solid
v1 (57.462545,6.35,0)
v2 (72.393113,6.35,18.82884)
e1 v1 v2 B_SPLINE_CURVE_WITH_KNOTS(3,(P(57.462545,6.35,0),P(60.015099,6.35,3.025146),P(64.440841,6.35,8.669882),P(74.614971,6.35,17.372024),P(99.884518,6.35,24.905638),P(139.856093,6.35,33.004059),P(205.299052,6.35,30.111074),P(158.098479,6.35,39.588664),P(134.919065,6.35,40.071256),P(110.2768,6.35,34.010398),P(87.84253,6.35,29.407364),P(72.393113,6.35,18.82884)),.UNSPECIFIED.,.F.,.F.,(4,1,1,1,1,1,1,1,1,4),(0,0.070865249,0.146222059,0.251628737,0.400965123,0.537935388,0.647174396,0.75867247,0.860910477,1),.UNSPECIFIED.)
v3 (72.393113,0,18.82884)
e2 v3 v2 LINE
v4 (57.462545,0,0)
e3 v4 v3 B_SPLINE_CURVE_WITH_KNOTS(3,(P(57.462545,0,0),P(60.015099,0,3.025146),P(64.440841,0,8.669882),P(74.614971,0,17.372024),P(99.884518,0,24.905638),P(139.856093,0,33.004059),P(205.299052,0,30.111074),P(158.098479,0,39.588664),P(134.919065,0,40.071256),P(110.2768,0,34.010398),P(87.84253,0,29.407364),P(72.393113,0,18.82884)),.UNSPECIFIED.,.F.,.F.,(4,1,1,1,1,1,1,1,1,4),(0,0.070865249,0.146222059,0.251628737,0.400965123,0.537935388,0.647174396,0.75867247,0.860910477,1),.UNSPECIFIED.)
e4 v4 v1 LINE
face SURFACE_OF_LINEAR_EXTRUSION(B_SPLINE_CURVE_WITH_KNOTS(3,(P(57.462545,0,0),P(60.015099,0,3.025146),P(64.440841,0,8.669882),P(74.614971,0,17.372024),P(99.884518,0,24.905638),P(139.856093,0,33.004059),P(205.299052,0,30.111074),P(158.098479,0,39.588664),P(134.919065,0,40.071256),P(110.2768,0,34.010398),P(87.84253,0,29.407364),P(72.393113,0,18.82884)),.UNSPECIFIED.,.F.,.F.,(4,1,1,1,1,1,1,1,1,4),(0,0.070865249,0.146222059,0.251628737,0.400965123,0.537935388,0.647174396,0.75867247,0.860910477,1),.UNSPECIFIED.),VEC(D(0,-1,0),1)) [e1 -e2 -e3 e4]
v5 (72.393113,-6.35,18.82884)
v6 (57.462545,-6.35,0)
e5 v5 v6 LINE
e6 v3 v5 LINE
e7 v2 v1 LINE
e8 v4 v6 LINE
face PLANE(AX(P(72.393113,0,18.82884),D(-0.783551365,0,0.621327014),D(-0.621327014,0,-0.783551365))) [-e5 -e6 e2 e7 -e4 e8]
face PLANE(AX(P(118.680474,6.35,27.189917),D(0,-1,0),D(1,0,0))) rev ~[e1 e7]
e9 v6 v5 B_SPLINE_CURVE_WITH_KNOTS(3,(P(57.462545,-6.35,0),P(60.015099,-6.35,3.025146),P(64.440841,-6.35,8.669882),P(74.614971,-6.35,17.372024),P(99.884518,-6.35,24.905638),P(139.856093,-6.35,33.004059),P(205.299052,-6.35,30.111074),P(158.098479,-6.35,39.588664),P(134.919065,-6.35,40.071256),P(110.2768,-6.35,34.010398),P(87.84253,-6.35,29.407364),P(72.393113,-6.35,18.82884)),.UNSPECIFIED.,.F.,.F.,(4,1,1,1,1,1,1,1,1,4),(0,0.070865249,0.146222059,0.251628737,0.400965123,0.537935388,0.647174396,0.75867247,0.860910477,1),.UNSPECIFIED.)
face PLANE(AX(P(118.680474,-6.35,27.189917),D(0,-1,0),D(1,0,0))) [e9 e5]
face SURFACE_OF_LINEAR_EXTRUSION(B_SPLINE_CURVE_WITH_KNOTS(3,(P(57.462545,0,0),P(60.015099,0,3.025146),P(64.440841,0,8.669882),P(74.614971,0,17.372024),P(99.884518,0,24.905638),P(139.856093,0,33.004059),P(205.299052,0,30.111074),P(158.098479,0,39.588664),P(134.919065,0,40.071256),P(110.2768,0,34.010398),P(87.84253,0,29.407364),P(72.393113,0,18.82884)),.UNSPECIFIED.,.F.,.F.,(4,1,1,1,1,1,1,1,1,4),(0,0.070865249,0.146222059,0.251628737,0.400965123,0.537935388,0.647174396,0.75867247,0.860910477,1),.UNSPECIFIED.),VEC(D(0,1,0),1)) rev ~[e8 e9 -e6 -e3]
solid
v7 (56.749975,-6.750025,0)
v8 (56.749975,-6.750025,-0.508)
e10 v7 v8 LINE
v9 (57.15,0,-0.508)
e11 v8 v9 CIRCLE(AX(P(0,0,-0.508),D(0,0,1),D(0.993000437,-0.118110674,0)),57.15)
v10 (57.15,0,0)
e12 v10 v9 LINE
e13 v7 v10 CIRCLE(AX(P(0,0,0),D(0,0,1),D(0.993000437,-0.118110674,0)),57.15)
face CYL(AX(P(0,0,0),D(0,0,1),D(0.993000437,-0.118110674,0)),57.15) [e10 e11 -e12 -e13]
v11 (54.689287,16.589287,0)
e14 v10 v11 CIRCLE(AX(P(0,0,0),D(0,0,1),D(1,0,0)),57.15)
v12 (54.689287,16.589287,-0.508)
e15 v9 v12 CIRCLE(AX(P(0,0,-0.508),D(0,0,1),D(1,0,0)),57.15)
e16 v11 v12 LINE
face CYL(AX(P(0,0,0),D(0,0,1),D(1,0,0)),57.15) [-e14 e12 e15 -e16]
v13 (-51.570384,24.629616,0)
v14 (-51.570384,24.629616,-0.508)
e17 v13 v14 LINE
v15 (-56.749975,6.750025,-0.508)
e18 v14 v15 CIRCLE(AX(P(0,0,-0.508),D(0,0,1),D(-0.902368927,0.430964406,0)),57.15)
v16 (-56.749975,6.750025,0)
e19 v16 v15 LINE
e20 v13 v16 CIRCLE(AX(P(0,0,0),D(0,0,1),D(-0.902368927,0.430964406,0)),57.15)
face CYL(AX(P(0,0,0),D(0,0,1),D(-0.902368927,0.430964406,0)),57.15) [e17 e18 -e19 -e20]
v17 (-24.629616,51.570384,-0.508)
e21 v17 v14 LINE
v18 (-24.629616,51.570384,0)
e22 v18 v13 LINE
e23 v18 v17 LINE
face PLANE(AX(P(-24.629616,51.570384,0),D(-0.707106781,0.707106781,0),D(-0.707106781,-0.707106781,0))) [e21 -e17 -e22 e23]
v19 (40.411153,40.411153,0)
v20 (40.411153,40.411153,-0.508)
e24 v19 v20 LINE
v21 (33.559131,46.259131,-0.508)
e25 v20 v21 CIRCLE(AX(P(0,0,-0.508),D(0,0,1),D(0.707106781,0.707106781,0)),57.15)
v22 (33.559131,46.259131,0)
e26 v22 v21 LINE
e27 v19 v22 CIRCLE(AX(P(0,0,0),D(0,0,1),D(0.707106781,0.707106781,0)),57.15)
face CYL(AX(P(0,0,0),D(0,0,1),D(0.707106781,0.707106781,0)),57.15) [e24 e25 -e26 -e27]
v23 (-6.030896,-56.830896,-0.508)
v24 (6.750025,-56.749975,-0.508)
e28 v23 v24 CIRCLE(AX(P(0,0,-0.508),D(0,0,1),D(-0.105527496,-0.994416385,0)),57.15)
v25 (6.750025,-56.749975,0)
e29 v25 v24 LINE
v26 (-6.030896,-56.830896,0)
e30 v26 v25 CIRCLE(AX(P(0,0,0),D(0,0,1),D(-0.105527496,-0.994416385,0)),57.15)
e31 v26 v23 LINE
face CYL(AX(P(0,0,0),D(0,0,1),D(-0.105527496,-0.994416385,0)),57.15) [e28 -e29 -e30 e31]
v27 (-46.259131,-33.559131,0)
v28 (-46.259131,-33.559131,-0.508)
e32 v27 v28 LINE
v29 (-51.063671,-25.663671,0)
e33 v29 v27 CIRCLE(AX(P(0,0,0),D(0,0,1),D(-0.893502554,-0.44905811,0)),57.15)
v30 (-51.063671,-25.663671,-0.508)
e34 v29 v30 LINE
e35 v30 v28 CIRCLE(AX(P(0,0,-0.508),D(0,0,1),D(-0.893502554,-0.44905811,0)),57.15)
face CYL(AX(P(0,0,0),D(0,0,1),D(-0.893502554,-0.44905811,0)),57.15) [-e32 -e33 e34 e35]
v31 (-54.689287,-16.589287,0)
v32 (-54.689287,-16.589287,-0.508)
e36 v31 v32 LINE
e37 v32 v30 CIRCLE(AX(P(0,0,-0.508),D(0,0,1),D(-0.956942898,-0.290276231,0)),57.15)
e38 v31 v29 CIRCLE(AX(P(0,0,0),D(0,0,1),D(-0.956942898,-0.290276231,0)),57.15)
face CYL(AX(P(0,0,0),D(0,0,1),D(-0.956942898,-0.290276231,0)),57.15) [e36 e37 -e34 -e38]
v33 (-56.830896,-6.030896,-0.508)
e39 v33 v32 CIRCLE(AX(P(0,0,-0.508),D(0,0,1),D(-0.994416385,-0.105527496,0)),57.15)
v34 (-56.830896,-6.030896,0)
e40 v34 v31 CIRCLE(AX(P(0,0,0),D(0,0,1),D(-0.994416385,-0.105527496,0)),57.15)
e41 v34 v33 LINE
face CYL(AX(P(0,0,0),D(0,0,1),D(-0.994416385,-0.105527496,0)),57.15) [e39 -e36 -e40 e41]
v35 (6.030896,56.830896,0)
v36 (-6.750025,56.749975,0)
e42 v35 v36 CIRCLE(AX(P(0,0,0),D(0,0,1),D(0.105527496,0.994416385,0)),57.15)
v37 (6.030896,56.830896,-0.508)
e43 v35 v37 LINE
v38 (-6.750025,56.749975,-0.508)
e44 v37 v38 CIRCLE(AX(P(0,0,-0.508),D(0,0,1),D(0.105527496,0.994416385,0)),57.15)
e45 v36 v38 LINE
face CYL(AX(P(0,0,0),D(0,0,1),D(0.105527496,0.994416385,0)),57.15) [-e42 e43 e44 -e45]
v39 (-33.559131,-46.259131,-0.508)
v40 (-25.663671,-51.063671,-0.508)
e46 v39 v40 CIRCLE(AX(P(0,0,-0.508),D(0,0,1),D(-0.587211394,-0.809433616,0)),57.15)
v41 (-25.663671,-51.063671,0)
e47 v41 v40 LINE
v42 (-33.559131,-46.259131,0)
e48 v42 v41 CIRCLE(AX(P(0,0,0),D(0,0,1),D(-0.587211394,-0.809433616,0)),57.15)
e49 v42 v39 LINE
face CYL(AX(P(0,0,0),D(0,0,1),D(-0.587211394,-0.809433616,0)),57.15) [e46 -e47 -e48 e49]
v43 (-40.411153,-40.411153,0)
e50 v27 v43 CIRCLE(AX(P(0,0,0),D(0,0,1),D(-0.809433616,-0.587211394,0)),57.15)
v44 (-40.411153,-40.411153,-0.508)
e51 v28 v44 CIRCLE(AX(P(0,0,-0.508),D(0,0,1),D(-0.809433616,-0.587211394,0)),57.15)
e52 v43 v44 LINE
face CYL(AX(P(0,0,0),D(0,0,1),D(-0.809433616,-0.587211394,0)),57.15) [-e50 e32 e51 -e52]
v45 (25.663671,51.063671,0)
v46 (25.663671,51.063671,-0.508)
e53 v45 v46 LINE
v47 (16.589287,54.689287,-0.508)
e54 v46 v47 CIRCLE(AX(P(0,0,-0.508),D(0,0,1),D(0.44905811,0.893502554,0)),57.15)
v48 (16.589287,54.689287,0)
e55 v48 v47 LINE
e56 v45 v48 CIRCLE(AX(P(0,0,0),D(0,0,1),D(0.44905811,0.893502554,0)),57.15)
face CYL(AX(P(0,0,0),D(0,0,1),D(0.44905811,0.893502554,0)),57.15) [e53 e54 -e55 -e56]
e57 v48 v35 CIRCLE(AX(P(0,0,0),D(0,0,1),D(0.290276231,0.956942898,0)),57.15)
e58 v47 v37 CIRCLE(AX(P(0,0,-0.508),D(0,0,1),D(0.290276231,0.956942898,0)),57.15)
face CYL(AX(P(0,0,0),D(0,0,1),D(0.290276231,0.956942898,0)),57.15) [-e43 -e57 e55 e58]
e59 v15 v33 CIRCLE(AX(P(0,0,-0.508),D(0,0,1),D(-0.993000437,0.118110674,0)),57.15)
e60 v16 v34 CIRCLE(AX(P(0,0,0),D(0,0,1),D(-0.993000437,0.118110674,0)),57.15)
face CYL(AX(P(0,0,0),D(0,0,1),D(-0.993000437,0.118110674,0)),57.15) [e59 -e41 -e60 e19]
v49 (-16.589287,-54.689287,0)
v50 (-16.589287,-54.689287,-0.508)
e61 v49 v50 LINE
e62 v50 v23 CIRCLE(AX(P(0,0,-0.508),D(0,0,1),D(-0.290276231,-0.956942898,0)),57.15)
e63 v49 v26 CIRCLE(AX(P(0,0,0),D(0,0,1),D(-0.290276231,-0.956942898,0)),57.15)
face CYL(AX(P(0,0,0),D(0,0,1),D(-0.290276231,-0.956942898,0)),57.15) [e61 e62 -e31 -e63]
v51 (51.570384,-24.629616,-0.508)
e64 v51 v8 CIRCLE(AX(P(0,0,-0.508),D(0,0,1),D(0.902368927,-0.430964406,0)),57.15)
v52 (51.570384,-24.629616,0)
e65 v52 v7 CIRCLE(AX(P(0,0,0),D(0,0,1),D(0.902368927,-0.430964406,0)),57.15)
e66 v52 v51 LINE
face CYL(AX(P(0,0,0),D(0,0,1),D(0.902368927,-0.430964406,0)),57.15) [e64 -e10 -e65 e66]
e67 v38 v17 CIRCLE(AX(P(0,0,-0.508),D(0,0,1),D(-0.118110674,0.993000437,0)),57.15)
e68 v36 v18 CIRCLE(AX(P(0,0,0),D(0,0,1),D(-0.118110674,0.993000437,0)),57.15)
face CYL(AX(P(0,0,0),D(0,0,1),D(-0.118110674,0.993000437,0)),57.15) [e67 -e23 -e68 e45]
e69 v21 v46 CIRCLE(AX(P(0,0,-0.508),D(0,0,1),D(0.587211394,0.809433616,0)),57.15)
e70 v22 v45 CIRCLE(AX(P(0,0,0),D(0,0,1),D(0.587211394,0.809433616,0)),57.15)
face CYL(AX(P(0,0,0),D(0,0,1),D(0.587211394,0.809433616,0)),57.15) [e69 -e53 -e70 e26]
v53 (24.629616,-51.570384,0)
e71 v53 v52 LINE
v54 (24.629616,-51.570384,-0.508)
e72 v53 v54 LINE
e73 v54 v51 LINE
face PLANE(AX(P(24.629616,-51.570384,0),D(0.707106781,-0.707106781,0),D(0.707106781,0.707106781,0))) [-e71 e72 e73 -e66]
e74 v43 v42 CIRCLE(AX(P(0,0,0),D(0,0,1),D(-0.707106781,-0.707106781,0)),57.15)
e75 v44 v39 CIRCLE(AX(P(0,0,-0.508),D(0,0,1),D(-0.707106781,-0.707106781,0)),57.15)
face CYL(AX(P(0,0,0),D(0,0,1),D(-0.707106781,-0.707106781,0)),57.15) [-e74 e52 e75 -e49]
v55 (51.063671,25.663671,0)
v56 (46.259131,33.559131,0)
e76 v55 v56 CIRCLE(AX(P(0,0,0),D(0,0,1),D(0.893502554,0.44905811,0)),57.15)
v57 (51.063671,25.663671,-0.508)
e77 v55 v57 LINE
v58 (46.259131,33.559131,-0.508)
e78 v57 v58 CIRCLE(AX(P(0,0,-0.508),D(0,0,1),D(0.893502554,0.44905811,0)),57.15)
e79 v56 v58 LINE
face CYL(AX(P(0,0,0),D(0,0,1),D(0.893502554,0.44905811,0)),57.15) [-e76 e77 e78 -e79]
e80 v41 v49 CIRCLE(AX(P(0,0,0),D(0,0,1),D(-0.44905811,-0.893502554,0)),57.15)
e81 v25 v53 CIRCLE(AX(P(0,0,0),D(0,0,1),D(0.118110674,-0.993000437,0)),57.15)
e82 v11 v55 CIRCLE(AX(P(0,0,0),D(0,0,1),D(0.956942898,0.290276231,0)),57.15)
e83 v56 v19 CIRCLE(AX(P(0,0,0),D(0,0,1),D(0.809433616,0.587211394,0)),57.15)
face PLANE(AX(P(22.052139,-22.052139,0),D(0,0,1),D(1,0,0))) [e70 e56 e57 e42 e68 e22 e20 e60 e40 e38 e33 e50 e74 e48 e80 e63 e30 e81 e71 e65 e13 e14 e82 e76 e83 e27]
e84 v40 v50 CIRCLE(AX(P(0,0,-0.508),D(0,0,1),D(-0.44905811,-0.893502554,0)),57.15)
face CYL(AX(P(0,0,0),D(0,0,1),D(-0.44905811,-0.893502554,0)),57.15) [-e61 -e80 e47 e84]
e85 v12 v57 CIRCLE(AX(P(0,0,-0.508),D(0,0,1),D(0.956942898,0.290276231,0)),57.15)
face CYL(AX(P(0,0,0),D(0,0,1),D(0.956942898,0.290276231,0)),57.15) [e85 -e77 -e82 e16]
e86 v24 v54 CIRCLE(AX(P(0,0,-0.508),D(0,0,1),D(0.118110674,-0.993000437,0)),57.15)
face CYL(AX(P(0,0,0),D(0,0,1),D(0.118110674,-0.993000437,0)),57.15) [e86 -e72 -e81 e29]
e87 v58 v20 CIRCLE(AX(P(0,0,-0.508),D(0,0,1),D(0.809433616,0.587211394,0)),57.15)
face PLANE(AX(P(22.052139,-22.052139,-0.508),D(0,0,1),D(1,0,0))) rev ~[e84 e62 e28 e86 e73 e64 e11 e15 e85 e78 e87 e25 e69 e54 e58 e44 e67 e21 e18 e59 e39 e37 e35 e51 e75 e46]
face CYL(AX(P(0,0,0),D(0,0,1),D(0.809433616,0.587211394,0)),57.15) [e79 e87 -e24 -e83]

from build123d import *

# Parameters (mm, degrees)
F4_DEPTH = 0.508
F6_DEPTH = 6.35


# Not quite as in the source:
# - the program builds the solid bodies; features that only make, move or delete a surface that nothing else refers to are left out


with BuildPart() as f4:
    # F0 (on Top) → F4 (new body)
    with BuildSketch(Plane.XY):
        with BuildLine():
            Line((-6.0308964237, -56.8308964237), (56.8308964237, 6.0308964237))
            ThreePointArc((56.8308964237, 6.0308964237), (56.009443014, 11.3606686977), (54.689286609, 16.589286609))
            Line((54.689286609, 16.589286609), (-16.589286609, -54.689286609))
            ThreePointArc((-16.589286609, -54.689286609), (-11.3606686977, -56.009443014), (-6.0308964237, -56.8308964237))
        make_face()
        with BuildLine():
            Line((-16.589286609, -54.689286609), (54.689286609, 16.589286609))
            ThreePointArc((54.689286609, 16.589286609), (53.0707840703, 21.2041122936), (51.0636709662, 25.6636709662))
            Line((51.0636709662, 25.6636709662), (-25.6636709662, -51.0636709662))
            ThreePointArc((-25.6636709662, -51.0636709662), (-21.2041122936, -53.0707840703), (-16.589286609, -54.689286609))
        make_face()
        with BuildLine():
            Line((-25.6636709662, -51.0636709662), (51.0636709662, 25.6636709662))
            ThreePointArc((51.0636709662, 25.6636709662), (48.8212712491, 29.7086851548), (46.2591311607, 33.5591311607))
            Line((46.2591311607, 33.5591311607), (-33.5591311607, -46.2591311607))
            ThreePointArc((-33.5591311607, -46.2591311607), (-29.7086851548, -48.8212712491), (-25.6636709662, -51.0636709662))
        make_face()
        with BuildLine():
            Line((-33.5591311607, -46.2591311607), (46.2591311607, 33.5591311607))
            ThreePointArc((46.2591311607, 33.5591311607), (43.4703585062, 37.1005448928), (40.4111525448, 40.4111525448))
            Line((40.4111525448, 40.4111525448), (-40.4111525448, -40.4111525448))
            ThreePointArc((-40.4111525448, -40.4111525448), (-37.1005448928, -43.4703585062), (-33.5591311607, -46.2591311607))
        make_face()
        with BuildLine():
            Line((-40.4111525448, -40.4111525448), (40.4111525448, 40.4111525448))
            ThreePointArc((40.4111525448, 40.4111525448), (37.1005448928, 43.4703585062), (33.5591311607, 46.2591311607))
            Line((33.5591311607, 46.2591311607), (-46.2591311607, -33.5591311607))
            ThreePointArc((-46.2591311607, -33.5591311607), (-43.4703585062, -37.1005448928), (-40.4111525448, -40.4111525448))
        make_face()
        with BuildLine():
            Line((-46.2591311607, -33.5591311607), (33.5591311607, 46.2591311607))
            ThreePointArc((33.5591311607, 46.2591311607), (29.7086851548, 48.8212712491), (25.6636709662, 51.0636709662))
            Line((25.6636709662, 51.0636709662), (-51.0636709662, -25.6636709662))
            ThreePointArc((-51.0636709662, -25.6636709662), (-48.8212712491, -29.7086851548), (-46.2591311607, -33.5591311607))
        make_face()
        with BuildLine():
            Line((-51.0636709662, -25.6636709662), (25.6636709662, 51.0636709662))
            ThreePointArc((25.6636709662, 51.0636709662), (21.2041122936, 53.0707840703), (16.589286609, 54.689286609))
            Line((16.589286609, 54.689286609), (-54.689286609, -16.589286609))
            ThreePointArc((-54.689286609, -16.589286609), (-53.0707840703, -21.2041122936), (-51.0636709662, -25.6636709662))
        make_face()
        with BuildLine():
            Line((-54.689286609, -16.589286609), (16.589286609, 54.689286609))
            ThreePointArc((16.589286609, 54.689286609), (11.3606686977, 56.009443014), (6.0308964237, 56.8308964237))
            Line((6.0308964237, 56.8308964237), (-56.8308964237, -6.0308964237))
            ThreePointArc((-56.8308964237, -6.0308964237), (-56.009443014, -11.3606686977), (-54.689286609, -16.589286609))
        make_face()
        with BuildLine():
            Line((-56.8308964237, -6.0308964237), (6.0308964237, 56.8308964237))
            ThreePointArc((6.0308964237, 56.8308964237), (-0.3618335895, 57.1488545507), (-6.750025, 56.749975))
            Line((-6.750025, 56.749975), (-56.749975, 6.750025))
            ThreePointArc((-56.749975, 6.750025), (-57.1488545507, 0.3618335895), (-56.8308964237, -6.0308964237))
        make_face()
        with BuildLine():
            Line((-56.749975, 6.750025), (-6.750025, 56.749975))
            ThreePointArc((-6.750025, 56.749975), (-15.9021226487, 54.8930323016), (-24.6296158184, 51.5703841816))
            Line((-24.6296158184, 51.5703841816), (-51.5703841816, 24.6296158184))
            ThreePointArc((-51.5703841816, 24.6296158184), (-54.8930323016, 15.9021226487), (-56.749975, 6.750025))
        make_face()
        with BuildLine():
            ThreePointArc((56.749975, -6.750025), (57.0499060965, -3.3809339502), (57.15, 0))
            ThreePointArc((57.15, 0), (57.0701683483, 3.0196663212), (56.8308964237, 6.0308964237))
            Line((56.8308964237, 6.0308964237), (-6.0308964237, -56.8308964237))
            ThreePointArc((-6.0308964237, -56.8308964237), (0.3618335895, -57.1488545507), (6.750025, -56.749975))
            Line((6.750025, -56.749975), (56.749975, -6.750025))
        make_face()
        with BuildLine():
            ThreePointArc((51.5703841816, -24.6296158184), (54.8930323016, -15.9021226487), (56.749975, -6.750025))
            Line((56.749975, -6.750025), (6.750025, -56.749975))
            ThreePointArc((6.750025, -56.749975), (15.9021226487, -54.8930323016), (24.6296158184, -51.5703841816))
            Line((24.6296158184, -51.5703841816), (51.5703841816, -24.6296158184))
        make_face()
    extrude(amount=-F4_DEPTH)


with BuildPart() as f6:
    # F5 (on Front) → F6 (new body, symmetric)
    with BuildSketch(Plane.XZ):
        with BuildLine():
            Line((72.3931133133, 18.8288400268), (57.4625453009, 0))
            add(Edge.make_bspline(
                [(57.4625453009, 0), (60.0150991548, 3.025146449), (64.4408409242, 8.6698817024), (74.6149706503, 17.3720244011), (99.8845177525, 24.9056378613), (139.8560927381, 33.0040594631), (205.2990521286, 30.1110742823), (158.0984786426, 39.5886639029), (134.9190645718, 40.0712558659), (110.2767996195, 34.0103979924), (87.8425301448, 29.4073637277), (72.3931133133, 18.8288400268)],
                knots=[0, 0, 0, 0, 0.0708652491, 0.1462220586, 0.2516287369, 0.400965123, 0.537935388, 0.6471743961, 0.7586724699, 0.860910477, 1, 1, 1, 1], degree=3))
        make_face()
    extrude(amount=F6_DEPTH, both=True)


solid = Compound([f4.part, f6.part])
